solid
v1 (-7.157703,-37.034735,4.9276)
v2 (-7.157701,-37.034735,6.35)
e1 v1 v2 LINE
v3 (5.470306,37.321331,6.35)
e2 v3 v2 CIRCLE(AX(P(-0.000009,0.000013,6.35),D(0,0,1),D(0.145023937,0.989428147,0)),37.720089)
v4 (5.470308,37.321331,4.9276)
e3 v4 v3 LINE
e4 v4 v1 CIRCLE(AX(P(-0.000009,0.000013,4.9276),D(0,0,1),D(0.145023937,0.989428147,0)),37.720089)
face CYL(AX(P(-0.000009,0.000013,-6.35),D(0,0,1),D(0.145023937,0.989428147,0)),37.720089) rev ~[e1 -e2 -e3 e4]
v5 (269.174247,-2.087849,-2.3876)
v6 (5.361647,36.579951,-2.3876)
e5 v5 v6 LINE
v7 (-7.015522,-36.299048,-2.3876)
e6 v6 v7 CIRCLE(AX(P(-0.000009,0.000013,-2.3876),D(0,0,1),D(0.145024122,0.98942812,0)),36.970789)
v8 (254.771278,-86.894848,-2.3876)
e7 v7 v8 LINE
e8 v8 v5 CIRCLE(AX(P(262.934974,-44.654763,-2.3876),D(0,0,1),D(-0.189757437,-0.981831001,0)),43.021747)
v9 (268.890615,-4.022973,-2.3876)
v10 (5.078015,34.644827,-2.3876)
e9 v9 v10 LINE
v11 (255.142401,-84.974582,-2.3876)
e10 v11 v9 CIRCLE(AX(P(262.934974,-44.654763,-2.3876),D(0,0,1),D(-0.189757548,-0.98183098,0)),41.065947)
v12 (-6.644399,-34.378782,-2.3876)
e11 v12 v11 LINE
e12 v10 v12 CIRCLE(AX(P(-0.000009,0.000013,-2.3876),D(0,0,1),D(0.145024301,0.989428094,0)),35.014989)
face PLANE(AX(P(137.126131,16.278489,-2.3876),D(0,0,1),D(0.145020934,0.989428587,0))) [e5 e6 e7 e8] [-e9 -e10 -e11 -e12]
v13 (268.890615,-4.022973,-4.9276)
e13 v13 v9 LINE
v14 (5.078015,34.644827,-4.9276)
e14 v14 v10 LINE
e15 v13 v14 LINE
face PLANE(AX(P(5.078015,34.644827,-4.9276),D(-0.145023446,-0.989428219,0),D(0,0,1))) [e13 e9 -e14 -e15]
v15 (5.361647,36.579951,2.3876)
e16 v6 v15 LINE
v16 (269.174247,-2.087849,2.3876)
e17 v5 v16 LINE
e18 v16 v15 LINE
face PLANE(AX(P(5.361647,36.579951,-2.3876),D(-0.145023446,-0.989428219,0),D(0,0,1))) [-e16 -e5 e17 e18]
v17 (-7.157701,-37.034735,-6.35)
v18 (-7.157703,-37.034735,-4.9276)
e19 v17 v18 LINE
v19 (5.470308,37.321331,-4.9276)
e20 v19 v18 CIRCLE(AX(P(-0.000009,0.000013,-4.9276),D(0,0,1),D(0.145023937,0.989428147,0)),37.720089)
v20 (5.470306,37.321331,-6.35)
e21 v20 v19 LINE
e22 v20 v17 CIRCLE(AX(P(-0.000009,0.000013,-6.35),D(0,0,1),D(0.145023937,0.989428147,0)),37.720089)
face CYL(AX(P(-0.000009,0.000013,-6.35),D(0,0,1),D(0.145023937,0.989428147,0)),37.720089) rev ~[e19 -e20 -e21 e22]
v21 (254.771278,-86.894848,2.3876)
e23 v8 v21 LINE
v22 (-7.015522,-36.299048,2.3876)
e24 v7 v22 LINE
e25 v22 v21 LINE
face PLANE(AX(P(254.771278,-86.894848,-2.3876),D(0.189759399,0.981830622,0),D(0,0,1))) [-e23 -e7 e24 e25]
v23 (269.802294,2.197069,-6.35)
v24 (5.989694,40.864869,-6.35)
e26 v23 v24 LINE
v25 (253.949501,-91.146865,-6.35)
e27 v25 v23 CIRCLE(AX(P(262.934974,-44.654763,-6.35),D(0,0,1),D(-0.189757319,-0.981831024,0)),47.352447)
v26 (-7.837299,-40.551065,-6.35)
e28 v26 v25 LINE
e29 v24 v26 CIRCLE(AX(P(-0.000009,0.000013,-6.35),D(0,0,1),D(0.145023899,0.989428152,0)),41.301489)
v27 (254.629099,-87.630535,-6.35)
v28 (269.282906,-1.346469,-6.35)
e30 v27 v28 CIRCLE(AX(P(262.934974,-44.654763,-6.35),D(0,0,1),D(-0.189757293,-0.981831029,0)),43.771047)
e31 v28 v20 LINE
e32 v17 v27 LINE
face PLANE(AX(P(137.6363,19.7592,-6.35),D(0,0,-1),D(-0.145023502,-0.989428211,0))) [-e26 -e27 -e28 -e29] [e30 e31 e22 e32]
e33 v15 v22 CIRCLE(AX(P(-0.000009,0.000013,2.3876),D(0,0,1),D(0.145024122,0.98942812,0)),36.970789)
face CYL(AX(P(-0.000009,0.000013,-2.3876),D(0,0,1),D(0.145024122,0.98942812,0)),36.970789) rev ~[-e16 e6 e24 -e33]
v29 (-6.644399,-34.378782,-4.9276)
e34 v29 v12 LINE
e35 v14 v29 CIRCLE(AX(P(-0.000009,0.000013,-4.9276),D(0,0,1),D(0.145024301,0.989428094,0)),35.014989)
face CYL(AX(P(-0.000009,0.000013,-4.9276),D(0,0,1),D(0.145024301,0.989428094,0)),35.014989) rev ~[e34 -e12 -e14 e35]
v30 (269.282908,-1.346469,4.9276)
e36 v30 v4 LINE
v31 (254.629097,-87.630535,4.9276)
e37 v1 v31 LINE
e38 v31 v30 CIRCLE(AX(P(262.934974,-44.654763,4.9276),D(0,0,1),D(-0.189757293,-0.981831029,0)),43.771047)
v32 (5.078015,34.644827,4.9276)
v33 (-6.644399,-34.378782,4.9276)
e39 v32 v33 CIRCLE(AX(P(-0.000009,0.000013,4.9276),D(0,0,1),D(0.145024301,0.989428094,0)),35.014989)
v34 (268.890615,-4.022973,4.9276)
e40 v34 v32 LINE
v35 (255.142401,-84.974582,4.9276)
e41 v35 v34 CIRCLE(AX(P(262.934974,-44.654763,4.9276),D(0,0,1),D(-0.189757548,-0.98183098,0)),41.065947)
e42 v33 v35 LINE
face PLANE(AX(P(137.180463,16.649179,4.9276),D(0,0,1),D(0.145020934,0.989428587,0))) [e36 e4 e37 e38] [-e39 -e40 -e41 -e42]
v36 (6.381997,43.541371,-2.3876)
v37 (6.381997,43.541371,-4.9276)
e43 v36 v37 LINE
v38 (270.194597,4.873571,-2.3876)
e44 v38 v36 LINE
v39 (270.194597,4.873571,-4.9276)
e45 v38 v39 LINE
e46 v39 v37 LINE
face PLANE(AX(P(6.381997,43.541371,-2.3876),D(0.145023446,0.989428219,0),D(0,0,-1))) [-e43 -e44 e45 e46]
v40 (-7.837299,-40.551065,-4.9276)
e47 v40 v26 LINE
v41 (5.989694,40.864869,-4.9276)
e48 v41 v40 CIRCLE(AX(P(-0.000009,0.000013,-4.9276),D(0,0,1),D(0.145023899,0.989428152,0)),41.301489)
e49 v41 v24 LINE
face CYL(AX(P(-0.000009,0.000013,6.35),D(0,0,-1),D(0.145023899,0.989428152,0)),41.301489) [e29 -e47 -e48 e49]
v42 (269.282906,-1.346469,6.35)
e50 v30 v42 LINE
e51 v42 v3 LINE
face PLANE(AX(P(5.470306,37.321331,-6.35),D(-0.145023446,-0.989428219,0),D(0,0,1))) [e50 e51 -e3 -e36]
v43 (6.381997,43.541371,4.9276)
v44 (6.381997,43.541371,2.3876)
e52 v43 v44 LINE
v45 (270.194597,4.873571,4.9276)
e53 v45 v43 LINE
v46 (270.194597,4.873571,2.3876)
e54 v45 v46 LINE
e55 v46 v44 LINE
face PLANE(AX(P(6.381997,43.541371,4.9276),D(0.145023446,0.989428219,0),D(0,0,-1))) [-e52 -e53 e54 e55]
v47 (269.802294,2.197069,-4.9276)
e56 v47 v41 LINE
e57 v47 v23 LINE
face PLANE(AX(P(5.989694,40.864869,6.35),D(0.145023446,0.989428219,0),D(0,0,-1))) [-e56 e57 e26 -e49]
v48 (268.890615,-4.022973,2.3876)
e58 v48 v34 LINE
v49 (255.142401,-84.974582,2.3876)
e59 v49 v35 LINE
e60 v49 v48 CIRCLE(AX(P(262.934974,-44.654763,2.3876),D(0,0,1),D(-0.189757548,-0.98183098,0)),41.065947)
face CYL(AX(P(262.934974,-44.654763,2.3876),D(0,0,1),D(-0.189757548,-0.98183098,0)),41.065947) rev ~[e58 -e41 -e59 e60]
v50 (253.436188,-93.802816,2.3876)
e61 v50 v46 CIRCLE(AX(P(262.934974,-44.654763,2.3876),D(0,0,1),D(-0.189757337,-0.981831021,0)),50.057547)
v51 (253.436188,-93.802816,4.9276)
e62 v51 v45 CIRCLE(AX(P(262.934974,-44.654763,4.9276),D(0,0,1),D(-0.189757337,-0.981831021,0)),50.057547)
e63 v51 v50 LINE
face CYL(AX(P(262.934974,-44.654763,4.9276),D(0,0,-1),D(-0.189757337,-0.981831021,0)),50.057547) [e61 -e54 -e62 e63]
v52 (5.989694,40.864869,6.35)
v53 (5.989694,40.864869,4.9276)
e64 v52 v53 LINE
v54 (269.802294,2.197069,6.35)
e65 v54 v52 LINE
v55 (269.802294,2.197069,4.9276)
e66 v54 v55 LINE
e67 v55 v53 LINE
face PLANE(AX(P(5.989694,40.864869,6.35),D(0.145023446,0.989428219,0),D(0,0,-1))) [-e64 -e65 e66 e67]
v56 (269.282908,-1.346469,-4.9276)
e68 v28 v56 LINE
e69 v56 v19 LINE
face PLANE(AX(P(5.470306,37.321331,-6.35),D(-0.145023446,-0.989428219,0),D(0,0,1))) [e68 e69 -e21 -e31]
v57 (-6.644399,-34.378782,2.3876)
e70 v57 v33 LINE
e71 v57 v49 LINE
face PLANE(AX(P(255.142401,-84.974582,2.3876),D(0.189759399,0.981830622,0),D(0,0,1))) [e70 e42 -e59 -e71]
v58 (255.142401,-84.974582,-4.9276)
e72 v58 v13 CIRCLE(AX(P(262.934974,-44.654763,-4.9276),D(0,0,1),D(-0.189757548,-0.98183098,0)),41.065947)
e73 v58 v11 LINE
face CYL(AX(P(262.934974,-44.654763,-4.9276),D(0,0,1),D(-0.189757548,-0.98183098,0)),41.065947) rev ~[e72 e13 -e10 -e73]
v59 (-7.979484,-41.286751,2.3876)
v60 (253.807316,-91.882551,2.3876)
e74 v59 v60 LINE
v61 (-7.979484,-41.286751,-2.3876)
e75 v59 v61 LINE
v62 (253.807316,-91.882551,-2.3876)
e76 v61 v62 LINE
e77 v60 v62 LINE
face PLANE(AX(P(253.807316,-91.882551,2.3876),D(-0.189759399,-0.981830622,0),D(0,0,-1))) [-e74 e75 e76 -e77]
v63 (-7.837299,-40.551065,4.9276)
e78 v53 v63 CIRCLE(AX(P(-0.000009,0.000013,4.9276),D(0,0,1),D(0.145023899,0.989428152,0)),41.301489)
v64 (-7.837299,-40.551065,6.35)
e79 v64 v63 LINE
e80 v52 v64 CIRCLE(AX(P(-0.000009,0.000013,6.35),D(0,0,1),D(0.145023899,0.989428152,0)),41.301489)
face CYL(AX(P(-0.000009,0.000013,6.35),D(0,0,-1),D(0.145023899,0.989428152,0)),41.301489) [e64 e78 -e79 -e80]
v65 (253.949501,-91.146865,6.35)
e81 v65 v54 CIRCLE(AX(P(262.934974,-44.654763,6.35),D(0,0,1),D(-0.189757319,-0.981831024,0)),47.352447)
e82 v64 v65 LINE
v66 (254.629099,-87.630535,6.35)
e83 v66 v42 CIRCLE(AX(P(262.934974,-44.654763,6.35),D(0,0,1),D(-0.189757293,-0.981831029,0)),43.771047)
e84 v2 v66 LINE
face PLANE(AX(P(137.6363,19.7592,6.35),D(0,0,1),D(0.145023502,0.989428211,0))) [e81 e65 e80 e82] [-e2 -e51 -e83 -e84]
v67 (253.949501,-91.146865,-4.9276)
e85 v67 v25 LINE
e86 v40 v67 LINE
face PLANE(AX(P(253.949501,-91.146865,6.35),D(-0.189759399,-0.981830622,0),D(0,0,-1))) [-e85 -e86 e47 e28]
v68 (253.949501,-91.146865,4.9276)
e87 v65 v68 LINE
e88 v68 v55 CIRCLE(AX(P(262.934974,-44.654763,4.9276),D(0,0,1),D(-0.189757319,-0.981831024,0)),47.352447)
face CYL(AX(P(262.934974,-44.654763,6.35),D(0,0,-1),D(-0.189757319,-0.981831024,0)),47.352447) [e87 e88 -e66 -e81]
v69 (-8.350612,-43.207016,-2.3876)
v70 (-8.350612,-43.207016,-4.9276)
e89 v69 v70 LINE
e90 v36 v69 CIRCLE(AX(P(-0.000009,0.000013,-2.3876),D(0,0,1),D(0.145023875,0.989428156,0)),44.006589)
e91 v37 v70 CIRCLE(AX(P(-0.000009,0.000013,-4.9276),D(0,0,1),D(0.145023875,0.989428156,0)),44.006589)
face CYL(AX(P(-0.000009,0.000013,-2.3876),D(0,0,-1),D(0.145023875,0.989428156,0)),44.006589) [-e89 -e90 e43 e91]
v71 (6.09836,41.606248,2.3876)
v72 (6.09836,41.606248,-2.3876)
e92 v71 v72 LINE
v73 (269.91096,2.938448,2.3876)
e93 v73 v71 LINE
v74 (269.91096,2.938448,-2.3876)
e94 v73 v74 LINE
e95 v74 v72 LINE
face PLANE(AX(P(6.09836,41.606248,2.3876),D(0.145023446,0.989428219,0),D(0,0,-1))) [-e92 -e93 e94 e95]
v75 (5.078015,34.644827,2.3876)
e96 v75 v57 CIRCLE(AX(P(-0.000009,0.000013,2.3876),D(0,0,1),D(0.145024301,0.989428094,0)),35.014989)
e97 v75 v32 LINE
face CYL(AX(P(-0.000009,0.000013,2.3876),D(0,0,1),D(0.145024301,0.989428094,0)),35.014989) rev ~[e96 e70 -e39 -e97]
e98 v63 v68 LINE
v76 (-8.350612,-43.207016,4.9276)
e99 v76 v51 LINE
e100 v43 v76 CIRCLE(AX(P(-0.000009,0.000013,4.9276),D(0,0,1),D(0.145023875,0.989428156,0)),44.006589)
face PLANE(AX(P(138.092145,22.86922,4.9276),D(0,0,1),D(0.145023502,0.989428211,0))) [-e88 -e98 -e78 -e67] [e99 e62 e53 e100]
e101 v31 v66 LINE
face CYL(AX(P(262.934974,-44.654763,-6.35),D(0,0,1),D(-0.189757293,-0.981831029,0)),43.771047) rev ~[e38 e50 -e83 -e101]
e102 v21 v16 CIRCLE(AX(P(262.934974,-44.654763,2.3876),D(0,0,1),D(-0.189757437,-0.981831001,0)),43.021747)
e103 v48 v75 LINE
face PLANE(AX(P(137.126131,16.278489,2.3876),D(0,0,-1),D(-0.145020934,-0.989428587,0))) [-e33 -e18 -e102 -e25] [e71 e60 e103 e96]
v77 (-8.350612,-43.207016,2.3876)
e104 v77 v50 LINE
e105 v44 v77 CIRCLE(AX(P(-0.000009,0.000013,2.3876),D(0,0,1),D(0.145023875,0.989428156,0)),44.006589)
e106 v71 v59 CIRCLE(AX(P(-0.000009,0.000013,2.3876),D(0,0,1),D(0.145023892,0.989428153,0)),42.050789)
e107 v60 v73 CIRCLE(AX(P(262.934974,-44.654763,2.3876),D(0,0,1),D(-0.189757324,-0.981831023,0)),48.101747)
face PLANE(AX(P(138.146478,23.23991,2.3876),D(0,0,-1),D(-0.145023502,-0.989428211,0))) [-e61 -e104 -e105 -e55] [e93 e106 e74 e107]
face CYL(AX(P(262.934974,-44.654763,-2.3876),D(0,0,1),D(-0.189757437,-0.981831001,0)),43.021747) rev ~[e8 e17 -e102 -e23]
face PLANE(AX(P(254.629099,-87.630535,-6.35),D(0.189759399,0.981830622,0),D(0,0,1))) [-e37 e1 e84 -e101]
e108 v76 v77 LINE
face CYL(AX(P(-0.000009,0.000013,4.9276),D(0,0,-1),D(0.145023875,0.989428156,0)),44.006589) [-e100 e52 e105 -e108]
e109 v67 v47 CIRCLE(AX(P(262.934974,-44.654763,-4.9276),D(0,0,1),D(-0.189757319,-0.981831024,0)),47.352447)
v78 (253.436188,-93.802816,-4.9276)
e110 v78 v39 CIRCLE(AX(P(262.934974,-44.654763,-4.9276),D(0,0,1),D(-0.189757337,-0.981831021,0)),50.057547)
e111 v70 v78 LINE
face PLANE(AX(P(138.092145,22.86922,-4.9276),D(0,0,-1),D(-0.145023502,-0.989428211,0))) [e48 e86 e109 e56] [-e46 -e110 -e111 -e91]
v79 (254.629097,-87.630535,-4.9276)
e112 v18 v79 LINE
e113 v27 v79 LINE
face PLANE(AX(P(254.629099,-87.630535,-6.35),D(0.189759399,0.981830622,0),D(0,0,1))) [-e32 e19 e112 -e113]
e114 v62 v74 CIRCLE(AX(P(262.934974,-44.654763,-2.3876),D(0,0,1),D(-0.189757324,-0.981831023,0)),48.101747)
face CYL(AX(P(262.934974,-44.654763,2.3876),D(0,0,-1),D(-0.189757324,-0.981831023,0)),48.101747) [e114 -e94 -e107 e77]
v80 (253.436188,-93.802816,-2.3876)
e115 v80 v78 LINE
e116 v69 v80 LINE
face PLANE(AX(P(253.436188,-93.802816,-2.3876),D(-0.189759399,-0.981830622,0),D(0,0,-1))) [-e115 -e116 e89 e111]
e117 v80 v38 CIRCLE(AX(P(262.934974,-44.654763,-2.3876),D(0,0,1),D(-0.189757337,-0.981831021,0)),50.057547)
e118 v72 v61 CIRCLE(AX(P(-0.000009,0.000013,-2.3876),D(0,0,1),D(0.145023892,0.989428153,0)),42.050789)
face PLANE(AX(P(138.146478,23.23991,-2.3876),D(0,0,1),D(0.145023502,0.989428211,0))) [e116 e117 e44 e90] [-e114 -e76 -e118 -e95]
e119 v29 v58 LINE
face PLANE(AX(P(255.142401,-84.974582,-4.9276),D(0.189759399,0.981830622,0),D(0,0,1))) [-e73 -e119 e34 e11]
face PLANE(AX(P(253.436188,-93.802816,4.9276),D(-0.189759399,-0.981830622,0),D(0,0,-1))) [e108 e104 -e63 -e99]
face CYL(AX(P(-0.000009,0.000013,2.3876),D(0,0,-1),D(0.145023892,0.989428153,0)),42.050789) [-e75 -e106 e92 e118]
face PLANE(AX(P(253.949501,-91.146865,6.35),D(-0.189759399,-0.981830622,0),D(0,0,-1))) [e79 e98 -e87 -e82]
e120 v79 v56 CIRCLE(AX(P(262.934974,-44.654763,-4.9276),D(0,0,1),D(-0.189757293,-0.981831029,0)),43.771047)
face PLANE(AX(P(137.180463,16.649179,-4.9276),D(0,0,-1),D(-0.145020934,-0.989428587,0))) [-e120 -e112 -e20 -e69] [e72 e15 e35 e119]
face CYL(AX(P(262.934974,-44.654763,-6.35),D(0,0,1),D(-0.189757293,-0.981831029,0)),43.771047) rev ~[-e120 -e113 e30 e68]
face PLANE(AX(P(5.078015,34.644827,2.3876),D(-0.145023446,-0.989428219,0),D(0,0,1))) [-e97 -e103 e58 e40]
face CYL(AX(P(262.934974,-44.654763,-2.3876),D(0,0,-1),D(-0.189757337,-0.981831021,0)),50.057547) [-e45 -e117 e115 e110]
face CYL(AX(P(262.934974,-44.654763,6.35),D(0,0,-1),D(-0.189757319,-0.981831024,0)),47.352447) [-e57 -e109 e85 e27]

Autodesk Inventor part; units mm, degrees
ref_plane "Work Plane2" through (262.935, -44.6548, 0) normal (-1, 0, 0) x (0, 0, 1)
ref_plane "Work Plane3" through (0, 0, 0) normal (0.9771898, -0.2123676, 0) x (0, 0, 1)
sketch "Path" plane through (0, 0, 0) normal (0, 0, 1) x (1, 0, 0)
  arc A0 (254.2893, -89.3887) -> (269.5426, 0.4253) centre (262.935, -44.6548) ccw
  arc A1 (5.73, 39.0931) -> (-7.4975, -38.7929) centre (0, 0) ccw
  line L0 (5.73, 39.0931) -> (269.5426, 0.4253)
  line L1 (254.2893, -89.3887) -> (-7.4975, -38.7929)
  dimension "d31" = 8.9916
ref_plane "Section Plane" through (269.5426, 0.4253, 0) normal (-0.9894282, 0.1450235, 0) x (0, 0, 1)
sketch "Section Sketch" plane through (269.5426, 0.4253, 0) normal (-0.9894282, 0.1450235, 0) x (0, 0, 1)
  line L0 (-6.35, -1.7907) -> (6.35, -1.7907)
  line L1 (6.35, -1.7907) -> (6.35, 1.7907)
  line L2 (6.35, 1.7907) -> (-6.35, 1.7907)
  line L3 (-6.35, 1.7907) -> (-6.35, -1.7907)
  line L4 (-2.3876, -2.54) -> (2.3876, -2.54)
  line L5 (2.3876, -2.54) -> (2.3876, 2.54)
  line L6 (2.3876, 2.54) -> (-2.3876, 2.54)
  line L7 (-2.3876, 2.54) -> (-2.3876, -2.54)
  line L8 (-2.3876, 0) -> (2.3876, 0) construction
  line L9 (-4.9276, -4.4958) -> (-2.3876, -4.4958)
  line L10 (-2.3876, -4.4958) -> (-2.3876, 4.4958)
  line L11 (-2.3876, 4.4958) -> (-4.9276, 4.4958)
  line L12 (-4.9276, 4.4958) -> (-4.9276, -4.4958)
  line L13 (2.3876, -4.4958) -> (4.9276, -4.4958)
  line L14 (4.9276, -4.4958) -> (4.9276, 4.4958)
  line L15 (4.9276, 4.4958) -> (2.3876, 4.4958)
  line L16 (2.3876, 4.4958) -> (2.3876, -4.4958)
  line L17 (-6.35, 0) -> (6.35, 0) construction
  point P0 (0, 0)
  point P1 (0, 0)
  dimension "d21" = 3.5814
  dimension "d22" = 5.08
  dimension "d23" = 4.7752
  dimension "d24" = 2.54
  dimension "d31" = 8.9916
  dimension "d32" = 12.7
sweep "Solid" add profiles "Section Sketch" path "Path"
pattern_of_one "Strand Pattern"
equation "\"d21\" = da_d2"
equation "\"d22\" = da_d1"
equation "\"d23\" = da_b1"
equation "\"d24\" = da_t1 + da_t2"
equation "\"d30\" = da_pt"
equation "\"da_p\" = 9.525"
equation "\"da_b1\" = 4.7752"
equation "\"da_h2\" = 8.9916"
equation "\"da_h3\" = 7.7978"
equation "\"da_d1\" = 5.08"
equation "\"da_d2\" = 3.5814"
equation "\"da_pt\" = 10.1346"
equation "\"da_b\" = 12.7"
equation "\"da_t1\" = 1.27"
equation "\"da_t2\" = 1.27"
properties part number "Roller Chain"
